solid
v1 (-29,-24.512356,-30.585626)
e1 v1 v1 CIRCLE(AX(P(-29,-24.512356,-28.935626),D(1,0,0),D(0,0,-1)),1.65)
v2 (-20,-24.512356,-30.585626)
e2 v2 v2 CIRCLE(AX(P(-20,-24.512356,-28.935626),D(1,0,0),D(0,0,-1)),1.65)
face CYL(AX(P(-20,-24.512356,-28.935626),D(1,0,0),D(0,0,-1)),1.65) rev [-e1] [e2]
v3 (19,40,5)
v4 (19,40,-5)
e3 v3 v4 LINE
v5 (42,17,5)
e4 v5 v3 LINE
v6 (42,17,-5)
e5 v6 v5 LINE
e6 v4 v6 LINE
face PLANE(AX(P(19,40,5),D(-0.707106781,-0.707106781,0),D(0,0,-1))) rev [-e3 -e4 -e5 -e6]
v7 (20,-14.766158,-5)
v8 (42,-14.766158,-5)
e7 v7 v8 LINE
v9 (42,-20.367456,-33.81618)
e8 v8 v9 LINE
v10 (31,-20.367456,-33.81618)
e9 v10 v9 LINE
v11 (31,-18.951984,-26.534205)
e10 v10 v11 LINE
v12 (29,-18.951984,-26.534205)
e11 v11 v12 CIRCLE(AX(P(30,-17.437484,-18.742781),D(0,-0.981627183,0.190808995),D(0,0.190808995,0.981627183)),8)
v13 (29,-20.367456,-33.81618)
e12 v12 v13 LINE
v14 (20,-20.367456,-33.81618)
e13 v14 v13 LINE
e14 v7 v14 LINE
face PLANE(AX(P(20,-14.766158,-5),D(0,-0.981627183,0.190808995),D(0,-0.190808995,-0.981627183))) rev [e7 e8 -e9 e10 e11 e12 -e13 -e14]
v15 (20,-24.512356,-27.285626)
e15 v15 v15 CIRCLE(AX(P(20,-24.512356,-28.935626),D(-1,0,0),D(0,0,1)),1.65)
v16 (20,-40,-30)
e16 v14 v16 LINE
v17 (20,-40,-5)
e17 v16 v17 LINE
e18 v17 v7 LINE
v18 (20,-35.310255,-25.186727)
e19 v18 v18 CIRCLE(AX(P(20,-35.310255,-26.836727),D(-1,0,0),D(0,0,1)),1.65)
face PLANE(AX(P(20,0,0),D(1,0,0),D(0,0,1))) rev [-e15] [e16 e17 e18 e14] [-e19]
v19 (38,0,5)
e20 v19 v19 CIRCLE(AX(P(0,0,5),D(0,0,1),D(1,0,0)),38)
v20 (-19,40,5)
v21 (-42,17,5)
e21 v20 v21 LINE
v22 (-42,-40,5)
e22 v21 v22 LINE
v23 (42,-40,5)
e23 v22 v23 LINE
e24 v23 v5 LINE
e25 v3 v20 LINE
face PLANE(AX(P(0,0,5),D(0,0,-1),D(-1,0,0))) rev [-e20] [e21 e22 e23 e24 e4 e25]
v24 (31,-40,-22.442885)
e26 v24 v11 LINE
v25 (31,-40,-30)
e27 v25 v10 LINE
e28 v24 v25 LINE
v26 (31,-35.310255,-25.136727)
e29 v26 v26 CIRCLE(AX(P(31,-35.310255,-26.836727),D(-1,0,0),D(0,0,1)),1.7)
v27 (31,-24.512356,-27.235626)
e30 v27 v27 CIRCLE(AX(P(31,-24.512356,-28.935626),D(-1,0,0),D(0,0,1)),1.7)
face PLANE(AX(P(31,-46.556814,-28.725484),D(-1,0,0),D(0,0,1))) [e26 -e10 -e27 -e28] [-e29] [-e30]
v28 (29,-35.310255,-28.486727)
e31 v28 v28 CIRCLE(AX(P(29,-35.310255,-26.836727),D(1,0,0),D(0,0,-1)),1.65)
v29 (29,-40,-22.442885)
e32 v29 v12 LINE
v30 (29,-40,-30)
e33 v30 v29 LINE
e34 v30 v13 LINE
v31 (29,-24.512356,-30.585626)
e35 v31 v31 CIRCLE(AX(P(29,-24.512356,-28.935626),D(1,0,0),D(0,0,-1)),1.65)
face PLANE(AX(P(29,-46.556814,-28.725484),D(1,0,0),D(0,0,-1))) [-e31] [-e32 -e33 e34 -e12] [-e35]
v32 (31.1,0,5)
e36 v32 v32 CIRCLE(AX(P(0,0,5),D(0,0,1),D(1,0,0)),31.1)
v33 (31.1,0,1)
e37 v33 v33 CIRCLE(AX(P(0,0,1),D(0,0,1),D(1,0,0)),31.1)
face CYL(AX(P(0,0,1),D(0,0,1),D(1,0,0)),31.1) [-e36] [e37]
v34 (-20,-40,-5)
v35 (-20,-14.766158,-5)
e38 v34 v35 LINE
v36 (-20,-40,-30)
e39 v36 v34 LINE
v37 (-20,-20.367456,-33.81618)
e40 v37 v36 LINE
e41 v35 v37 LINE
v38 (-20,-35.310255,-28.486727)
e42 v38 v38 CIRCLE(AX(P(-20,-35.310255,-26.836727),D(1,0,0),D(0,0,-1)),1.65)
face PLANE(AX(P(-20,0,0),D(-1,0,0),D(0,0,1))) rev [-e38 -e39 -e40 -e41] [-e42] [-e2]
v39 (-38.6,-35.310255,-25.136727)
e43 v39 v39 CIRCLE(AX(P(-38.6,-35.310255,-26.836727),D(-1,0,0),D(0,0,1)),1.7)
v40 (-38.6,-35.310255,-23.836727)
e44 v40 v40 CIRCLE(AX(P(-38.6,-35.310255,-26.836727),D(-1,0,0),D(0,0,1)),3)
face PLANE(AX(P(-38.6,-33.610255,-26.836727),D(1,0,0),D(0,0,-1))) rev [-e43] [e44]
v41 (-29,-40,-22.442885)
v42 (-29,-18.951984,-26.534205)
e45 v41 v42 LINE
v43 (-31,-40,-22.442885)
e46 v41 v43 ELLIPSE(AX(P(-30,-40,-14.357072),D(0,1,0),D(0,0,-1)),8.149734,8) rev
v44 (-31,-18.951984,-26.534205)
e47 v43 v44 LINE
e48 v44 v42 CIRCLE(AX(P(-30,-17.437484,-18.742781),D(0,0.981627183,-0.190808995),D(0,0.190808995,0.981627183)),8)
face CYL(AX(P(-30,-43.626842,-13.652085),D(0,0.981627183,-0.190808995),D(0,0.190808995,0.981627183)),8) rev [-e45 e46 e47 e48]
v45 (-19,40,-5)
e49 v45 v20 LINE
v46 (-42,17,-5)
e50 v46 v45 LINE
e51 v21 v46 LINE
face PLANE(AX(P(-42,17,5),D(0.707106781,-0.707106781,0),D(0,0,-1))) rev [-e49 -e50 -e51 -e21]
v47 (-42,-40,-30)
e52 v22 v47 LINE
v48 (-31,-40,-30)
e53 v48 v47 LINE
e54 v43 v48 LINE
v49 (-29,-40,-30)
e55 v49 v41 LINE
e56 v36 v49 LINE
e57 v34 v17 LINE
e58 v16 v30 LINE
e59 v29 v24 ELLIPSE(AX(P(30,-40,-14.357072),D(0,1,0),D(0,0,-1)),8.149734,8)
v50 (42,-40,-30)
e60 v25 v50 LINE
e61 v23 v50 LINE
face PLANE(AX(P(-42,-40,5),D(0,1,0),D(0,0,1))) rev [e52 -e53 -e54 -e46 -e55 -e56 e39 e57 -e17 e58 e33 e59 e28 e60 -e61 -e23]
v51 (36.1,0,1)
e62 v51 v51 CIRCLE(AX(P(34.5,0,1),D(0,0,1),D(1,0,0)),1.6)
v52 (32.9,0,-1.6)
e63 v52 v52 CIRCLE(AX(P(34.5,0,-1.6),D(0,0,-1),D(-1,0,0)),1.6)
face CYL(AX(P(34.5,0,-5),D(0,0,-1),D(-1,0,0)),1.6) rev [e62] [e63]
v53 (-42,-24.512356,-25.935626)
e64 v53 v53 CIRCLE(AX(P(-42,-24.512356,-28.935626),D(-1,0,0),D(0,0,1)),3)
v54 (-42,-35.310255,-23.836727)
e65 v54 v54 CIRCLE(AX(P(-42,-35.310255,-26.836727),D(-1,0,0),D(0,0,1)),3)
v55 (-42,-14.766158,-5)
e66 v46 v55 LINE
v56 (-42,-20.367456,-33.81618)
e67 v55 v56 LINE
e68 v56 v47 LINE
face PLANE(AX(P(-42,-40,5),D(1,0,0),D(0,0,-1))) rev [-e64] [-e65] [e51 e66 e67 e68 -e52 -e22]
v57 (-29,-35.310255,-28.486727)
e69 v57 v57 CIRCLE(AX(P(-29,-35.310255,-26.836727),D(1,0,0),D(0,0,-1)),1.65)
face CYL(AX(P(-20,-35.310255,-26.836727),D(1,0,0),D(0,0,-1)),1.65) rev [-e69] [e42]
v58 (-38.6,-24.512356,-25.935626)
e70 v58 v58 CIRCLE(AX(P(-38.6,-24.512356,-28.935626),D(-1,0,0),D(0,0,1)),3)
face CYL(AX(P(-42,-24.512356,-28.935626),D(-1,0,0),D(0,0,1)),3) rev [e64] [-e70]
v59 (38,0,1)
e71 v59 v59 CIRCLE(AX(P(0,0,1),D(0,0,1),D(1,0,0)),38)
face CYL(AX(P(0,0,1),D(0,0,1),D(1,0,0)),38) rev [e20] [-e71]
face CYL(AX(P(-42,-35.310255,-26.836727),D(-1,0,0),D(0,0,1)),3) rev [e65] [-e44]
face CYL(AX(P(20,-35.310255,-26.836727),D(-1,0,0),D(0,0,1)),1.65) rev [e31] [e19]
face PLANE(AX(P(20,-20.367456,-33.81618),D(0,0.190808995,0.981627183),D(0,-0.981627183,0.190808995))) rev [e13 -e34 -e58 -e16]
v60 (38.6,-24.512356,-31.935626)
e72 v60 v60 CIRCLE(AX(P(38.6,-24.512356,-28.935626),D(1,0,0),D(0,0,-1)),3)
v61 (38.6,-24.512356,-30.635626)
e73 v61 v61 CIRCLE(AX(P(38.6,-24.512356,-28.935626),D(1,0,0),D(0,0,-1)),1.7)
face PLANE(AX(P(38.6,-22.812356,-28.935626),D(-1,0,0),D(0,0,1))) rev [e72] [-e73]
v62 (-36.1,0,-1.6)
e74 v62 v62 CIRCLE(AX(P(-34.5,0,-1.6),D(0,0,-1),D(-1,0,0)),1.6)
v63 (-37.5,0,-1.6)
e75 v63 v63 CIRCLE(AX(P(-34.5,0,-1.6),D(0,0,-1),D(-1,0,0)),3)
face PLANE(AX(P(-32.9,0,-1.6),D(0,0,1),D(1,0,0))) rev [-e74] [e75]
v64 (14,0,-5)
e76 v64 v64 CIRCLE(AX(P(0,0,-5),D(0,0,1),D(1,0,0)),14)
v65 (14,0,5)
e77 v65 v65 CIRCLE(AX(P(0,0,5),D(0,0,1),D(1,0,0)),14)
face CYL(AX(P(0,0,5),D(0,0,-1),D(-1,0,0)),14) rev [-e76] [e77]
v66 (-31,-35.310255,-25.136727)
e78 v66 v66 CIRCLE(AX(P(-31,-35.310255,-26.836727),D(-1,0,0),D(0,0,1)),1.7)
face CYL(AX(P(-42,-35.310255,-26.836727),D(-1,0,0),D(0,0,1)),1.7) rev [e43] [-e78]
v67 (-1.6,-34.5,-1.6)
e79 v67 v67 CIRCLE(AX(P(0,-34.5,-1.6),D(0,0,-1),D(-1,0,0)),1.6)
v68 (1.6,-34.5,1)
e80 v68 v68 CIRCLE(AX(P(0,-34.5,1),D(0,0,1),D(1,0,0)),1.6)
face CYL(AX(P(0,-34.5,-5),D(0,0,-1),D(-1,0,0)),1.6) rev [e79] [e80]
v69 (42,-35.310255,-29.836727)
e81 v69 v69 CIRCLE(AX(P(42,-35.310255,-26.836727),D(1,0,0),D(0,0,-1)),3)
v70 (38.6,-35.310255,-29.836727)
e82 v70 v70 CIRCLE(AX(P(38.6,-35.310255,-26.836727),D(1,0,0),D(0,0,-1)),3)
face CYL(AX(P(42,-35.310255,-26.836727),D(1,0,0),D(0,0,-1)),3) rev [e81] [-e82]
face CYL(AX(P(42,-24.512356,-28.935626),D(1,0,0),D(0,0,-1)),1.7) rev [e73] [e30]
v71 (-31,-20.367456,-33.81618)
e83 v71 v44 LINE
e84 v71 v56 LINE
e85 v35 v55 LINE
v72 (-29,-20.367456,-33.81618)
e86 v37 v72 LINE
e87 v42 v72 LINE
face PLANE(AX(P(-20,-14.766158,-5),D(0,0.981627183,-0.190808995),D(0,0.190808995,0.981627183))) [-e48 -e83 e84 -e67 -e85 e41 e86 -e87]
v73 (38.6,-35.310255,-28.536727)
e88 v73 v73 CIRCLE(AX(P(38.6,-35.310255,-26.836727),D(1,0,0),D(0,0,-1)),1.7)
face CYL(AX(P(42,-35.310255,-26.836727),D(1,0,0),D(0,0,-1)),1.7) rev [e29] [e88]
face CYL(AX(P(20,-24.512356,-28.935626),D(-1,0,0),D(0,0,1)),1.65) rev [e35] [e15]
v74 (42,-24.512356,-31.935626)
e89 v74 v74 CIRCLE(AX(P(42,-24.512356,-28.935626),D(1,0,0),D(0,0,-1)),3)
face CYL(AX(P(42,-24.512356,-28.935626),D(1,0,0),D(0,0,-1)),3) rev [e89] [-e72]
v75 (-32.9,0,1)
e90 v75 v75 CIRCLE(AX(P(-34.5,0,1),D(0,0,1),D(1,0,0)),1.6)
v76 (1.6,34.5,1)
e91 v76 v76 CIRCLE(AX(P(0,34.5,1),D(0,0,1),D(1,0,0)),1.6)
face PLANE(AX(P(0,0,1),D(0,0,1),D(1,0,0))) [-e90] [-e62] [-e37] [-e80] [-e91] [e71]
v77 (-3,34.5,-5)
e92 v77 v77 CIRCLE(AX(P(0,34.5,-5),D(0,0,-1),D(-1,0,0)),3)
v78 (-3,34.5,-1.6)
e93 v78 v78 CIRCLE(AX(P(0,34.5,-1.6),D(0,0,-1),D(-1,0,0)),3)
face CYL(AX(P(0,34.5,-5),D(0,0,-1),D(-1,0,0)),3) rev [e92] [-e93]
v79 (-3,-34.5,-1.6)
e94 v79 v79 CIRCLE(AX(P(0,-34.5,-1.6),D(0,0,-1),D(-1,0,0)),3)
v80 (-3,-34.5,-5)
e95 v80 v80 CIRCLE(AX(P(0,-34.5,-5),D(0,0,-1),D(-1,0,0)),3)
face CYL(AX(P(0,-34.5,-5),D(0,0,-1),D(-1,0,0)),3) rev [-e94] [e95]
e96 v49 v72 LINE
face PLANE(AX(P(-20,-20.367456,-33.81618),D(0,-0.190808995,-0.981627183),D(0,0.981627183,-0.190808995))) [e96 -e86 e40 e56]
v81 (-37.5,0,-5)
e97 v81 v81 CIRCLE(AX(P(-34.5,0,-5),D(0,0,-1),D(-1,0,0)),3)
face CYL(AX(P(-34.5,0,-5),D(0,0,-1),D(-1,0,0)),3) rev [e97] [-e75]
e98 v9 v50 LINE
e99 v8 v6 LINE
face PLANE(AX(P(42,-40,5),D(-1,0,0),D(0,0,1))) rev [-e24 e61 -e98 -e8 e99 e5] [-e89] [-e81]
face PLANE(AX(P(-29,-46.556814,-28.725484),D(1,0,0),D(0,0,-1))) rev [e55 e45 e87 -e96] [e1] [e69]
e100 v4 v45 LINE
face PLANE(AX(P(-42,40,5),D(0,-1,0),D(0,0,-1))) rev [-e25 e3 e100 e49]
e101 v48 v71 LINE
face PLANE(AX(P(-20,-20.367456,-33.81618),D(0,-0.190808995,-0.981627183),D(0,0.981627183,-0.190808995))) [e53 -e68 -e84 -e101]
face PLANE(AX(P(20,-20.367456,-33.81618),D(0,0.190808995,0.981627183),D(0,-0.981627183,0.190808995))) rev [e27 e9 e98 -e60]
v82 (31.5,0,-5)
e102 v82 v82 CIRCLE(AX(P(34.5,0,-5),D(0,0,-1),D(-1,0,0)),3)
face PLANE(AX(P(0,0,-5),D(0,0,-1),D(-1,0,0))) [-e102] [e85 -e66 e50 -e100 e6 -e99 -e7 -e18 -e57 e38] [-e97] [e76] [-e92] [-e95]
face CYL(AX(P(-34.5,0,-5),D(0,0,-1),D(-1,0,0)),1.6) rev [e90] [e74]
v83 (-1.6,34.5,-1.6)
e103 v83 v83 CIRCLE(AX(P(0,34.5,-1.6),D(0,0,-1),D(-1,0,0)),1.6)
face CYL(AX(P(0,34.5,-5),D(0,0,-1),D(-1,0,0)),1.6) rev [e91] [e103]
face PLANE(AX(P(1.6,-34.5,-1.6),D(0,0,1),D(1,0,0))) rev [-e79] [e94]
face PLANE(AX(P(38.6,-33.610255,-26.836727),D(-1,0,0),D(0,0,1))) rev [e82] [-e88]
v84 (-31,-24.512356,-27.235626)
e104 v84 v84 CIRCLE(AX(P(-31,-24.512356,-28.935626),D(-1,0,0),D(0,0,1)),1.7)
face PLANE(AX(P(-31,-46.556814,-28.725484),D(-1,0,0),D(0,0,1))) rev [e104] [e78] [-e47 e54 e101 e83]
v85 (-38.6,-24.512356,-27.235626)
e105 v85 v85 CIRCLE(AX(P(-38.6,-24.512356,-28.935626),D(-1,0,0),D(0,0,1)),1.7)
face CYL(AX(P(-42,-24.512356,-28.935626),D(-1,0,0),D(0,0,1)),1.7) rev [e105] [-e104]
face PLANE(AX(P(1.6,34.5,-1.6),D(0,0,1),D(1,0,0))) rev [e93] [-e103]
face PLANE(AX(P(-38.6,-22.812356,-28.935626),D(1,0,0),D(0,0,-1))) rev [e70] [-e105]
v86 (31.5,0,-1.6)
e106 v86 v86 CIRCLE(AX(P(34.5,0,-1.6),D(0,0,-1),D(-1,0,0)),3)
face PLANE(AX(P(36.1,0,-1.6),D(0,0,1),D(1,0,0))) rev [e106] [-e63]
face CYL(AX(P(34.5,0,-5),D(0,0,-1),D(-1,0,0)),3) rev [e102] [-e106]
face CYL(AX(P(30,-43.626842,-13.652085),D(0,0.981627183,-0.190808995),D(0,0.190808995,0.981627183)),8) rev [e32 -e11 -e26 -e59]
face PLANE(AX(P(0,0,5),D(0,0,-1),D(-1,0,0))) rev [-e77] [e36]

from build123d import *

# Parameters (mm, degrees)
SKETCH_1_W                  = 84
SKETCH_1_H                  = 80
SKETCH_1_R                  = 14
EXTRUDE_1_DEPTH             = 5
EXTRUDE_2_DEPTH             = 22
CUT_EXTRUDE_3_REACH         = 79
HOLE_START                  = -42
HOLE_WIZARD_2_OUTLINE_R     = 1.7
HOLE_WIZARD_2_DEPTH         = 11
HOLE_WIZARD_2_2_OUTLINE_R   = 3
HOLE_WIZARD_2_2_OUTLINE_R_2 = 1.7
HOLE_WIZARD_2_2_DEPTH       = 3.4
HOLE_WIZARD_M4_2_D          = 3.3
SKETCH_14_R                 = 38
SKETCH_14_R_2               = 31.1
CUT_EXTRUDE_4_DEPTH         = 4
HOLE_WIZARD_3_D             = 3.2
HOLE_WIZARD_3_CBORE_D       = 6
HOLE_WIZARD_3_CBORE_DEPTH   = 3.4
CHAMFER_1_SIZE              = 23


# Read off the part's stored shape, not the designer's step: 打孔尺寸(%根据)内六角圆柱头螺钉的类型2
with BuildPart() as part:
    # 草图1 → 凸台-拉伸1 (new, symmetric)
    with BuildSketch(Plane.XY):
        Rectangle(SKETCH_1_W, SKETCH_1_H)
        Circle(SKETCH_1_R, mode=Mode.SUBTRACT)
    extrude(amount=EXTRUDE_1_DEPTH, both=True)

    # 草图6 → 凸台-拉伸2 (add)
    with BuildSketch(Plane.ZY.offset(42)):
        Polygon((-5, -14.766158372), (-5, -40), (-30, -40), (-33.816179908, -20.367456331), align=None)
    extrude_2 = extrude(amount=-EXTRUDE_2_DEPTH)

    # 切除-拉伸3: up to this plane
    cut_extrude_3_end = Plane(origin=(-42, -40, 5), z_dir=(0, 1, 0))
    # 草图7 → 切除-拉伸3 (cut, up to the surface)
    with BuildSketch(Plane(origin=(0, -13.292034521, 2.583709779), x_dir=(1, 0, 0), z_dir=(0, 0.9816271834476648, -0.19080899537654153)), mode=Mode.PRIVATE) as cut_extrude_3_sk1:
        with BuildLine():
            Line((-31, 37.081175318), (-29, 37.081175318))
            Line((-29, 37.081175318), (-29, 29.662905695))
            ThreePointArc((-29, 29.662905695), (-30, 13.725651762), (-31, 29.662905695))
            Line((-31, 29.662905695), (-31, 37.081175318))
        make_face()
    cut_extrude_3_tool1 = split(extrude(cut_extrude_3_sk1.sketch, amount=-CUT_EXTRUDE_3_REACH, mode=Mode.PRIVATE), bisect_by=cut_extrude_3_end, keep=Keep.BOTH, mode=Mode.PRIVATE)
    cut_extrude_3 = cut_extrude_3_tool1.solids().sort_by_distance((-30, -17.589666, -19.525688))[0]
    add(cut_extrude_3, mode=Mode.SUBTRACT)

    # 打孔尺寸(%根据)内六角圆柱头螺钉的类型2 outline → 打孔尺寸(%根据)内六角圆柱头螺钉的类型2 (cut)
    with BuildSketch(Plane.YZ.offset(HOLE_START)):
        with Locations((-35.310255285, -26.836727248)):
            Circle(HOLE_WIZARD_2_OUTLINE_R)
        with Locations((-24.512356267, -28.935626197)):
            Circle(HOLE_WIZARD_2_OUTLINE_R)
    hole_wizard_2 = extrude(amount=HOLE_WIZARD_2_DEPTH, mode=Mode.SUBTRACT)

    # Hole Wizard 2 2 outline → Hole Wizard 2 2 (cut)
    # profile 1 of 2: a face of its own
    with BuildSketch(Plane.YZ.offset(HOLE_START)):
        with Locations((-35.310255285, -26.836727248)):
            Circle(HOLE_WIZARD_2_2_OUTLINE_R)
        with Locations((-35.310255285, -26.836727248)):
            Circle(HOLE_WIZARD_2_2_OUTLINE_R_2, mode=Mode.SUBTRACT)
    # profile 2 of 2: a face of its own
    with BuildSketch(Plane.YZ.offset(HOLE_START)):
        with Locations((-24.512356267, -28.935626197)):
            Circle(HOLE_WIZARD_2_2_OUTLINE_R)
        with Locations((-24.512356267, -28.935626197)):
            Circle(HOLE_WIZARD_2_2_OUTLINE_R_2, mode=Mode.SUBTRACT)
    hole_wizard_2_2 = extrude(amount=HOLE_WIZARD_2_2_DEPTH, mode=Mode.SUBTRACT)

    # M4 螺纹孔2 (through all)
    with Locations(Plane(origin=(-20, 0, 0), x_dir=(0, 0, -1), z_dir=(1, 0, 0))):
        with Locations((28.935626197, -24.512356267), (26.836727248, -35.310255285)):
            hole_wizard_m4_2 = Hole(HOLE_WIZARD_M4_2_D / 2)

    # 草图14 → 切除-拉伸4 (cut)
    with BuildSketch(Plane.XY.offset(5)):
        Circle(SKETCH_14_R)
        Circle(SKETCH_14_R_2, mode=Mode.SUBTRACT)
    extrude(amount=-CUT_EXTRUDE_4_DEPTH, mode=Mode.SUBTRACT)

    # 镜向1: 凸台-拉伸2, 切除-拉伸3, 打孔尺寸(%根据)内六角圆柱头螺钉的类型2, Hole Wizard 2 2, M4 螺纹孔2 across plane
    add(extrude_2.mirror(Plane(origin=(0, 0, 0), x_dir=(0, 0, 1), z_dir=(1, 0, 0))))
    add(cut_extrude_3.mirror(Plane(origin=(0, 0, 0), x_dir=(0, 0, 1), z_dir=(1, 0, 0))), mode=Mode.SUBTRACT)
    add(hole_wizard_2.mirror(Plane(origin=(0, 0, 0), x_dir=(0, 0, 1), z_dir=(1, 0, 0))), mode=Mode.SUBTRACT)
    add(hole_wizard_2_2.mirror(Plane(origin=(0, 0, 0), x_dir=(0, 0, 1), z_dir=(1, 0, 0))), mode=Mode.SUBTRACT)
    add(hole_wizard_m4_2.mirror(Plane(origin=(0, 0, 0), x_dir=(0, 0, 1), z_dir=(1, 0, 0))), mode=Mode.SUBTRACT)

    # 打孔尺寸(%根据)内六角圆柱头螺钉的类型3 (through all)
    with Locations(Plane(origin=(0, 0, -5), x_dir=(-1, 0, 0), z_dir=(0, 0, -1))):
        with Locations((0, 34.5), (34.5, 0), (0, -34.5), (-34.5, 0)):
            CounterBoreHole(HOLE_WIZARD_3_D / 2, HOLE_WIZARD_3_CBORE_D / 2, HOLE_WIZARD_3_CBORE_DEPTH)

    # 倒角1
    chamfer_1_edges = [part.edges().sort_by_distance(p)[0] for p in [
        (42, 40, 0),
        (-42, 40, 0),
    ]]
    chamfer(chamfer_1_edges, length=CHAMFER_1_SIZE)


solid = part.part
